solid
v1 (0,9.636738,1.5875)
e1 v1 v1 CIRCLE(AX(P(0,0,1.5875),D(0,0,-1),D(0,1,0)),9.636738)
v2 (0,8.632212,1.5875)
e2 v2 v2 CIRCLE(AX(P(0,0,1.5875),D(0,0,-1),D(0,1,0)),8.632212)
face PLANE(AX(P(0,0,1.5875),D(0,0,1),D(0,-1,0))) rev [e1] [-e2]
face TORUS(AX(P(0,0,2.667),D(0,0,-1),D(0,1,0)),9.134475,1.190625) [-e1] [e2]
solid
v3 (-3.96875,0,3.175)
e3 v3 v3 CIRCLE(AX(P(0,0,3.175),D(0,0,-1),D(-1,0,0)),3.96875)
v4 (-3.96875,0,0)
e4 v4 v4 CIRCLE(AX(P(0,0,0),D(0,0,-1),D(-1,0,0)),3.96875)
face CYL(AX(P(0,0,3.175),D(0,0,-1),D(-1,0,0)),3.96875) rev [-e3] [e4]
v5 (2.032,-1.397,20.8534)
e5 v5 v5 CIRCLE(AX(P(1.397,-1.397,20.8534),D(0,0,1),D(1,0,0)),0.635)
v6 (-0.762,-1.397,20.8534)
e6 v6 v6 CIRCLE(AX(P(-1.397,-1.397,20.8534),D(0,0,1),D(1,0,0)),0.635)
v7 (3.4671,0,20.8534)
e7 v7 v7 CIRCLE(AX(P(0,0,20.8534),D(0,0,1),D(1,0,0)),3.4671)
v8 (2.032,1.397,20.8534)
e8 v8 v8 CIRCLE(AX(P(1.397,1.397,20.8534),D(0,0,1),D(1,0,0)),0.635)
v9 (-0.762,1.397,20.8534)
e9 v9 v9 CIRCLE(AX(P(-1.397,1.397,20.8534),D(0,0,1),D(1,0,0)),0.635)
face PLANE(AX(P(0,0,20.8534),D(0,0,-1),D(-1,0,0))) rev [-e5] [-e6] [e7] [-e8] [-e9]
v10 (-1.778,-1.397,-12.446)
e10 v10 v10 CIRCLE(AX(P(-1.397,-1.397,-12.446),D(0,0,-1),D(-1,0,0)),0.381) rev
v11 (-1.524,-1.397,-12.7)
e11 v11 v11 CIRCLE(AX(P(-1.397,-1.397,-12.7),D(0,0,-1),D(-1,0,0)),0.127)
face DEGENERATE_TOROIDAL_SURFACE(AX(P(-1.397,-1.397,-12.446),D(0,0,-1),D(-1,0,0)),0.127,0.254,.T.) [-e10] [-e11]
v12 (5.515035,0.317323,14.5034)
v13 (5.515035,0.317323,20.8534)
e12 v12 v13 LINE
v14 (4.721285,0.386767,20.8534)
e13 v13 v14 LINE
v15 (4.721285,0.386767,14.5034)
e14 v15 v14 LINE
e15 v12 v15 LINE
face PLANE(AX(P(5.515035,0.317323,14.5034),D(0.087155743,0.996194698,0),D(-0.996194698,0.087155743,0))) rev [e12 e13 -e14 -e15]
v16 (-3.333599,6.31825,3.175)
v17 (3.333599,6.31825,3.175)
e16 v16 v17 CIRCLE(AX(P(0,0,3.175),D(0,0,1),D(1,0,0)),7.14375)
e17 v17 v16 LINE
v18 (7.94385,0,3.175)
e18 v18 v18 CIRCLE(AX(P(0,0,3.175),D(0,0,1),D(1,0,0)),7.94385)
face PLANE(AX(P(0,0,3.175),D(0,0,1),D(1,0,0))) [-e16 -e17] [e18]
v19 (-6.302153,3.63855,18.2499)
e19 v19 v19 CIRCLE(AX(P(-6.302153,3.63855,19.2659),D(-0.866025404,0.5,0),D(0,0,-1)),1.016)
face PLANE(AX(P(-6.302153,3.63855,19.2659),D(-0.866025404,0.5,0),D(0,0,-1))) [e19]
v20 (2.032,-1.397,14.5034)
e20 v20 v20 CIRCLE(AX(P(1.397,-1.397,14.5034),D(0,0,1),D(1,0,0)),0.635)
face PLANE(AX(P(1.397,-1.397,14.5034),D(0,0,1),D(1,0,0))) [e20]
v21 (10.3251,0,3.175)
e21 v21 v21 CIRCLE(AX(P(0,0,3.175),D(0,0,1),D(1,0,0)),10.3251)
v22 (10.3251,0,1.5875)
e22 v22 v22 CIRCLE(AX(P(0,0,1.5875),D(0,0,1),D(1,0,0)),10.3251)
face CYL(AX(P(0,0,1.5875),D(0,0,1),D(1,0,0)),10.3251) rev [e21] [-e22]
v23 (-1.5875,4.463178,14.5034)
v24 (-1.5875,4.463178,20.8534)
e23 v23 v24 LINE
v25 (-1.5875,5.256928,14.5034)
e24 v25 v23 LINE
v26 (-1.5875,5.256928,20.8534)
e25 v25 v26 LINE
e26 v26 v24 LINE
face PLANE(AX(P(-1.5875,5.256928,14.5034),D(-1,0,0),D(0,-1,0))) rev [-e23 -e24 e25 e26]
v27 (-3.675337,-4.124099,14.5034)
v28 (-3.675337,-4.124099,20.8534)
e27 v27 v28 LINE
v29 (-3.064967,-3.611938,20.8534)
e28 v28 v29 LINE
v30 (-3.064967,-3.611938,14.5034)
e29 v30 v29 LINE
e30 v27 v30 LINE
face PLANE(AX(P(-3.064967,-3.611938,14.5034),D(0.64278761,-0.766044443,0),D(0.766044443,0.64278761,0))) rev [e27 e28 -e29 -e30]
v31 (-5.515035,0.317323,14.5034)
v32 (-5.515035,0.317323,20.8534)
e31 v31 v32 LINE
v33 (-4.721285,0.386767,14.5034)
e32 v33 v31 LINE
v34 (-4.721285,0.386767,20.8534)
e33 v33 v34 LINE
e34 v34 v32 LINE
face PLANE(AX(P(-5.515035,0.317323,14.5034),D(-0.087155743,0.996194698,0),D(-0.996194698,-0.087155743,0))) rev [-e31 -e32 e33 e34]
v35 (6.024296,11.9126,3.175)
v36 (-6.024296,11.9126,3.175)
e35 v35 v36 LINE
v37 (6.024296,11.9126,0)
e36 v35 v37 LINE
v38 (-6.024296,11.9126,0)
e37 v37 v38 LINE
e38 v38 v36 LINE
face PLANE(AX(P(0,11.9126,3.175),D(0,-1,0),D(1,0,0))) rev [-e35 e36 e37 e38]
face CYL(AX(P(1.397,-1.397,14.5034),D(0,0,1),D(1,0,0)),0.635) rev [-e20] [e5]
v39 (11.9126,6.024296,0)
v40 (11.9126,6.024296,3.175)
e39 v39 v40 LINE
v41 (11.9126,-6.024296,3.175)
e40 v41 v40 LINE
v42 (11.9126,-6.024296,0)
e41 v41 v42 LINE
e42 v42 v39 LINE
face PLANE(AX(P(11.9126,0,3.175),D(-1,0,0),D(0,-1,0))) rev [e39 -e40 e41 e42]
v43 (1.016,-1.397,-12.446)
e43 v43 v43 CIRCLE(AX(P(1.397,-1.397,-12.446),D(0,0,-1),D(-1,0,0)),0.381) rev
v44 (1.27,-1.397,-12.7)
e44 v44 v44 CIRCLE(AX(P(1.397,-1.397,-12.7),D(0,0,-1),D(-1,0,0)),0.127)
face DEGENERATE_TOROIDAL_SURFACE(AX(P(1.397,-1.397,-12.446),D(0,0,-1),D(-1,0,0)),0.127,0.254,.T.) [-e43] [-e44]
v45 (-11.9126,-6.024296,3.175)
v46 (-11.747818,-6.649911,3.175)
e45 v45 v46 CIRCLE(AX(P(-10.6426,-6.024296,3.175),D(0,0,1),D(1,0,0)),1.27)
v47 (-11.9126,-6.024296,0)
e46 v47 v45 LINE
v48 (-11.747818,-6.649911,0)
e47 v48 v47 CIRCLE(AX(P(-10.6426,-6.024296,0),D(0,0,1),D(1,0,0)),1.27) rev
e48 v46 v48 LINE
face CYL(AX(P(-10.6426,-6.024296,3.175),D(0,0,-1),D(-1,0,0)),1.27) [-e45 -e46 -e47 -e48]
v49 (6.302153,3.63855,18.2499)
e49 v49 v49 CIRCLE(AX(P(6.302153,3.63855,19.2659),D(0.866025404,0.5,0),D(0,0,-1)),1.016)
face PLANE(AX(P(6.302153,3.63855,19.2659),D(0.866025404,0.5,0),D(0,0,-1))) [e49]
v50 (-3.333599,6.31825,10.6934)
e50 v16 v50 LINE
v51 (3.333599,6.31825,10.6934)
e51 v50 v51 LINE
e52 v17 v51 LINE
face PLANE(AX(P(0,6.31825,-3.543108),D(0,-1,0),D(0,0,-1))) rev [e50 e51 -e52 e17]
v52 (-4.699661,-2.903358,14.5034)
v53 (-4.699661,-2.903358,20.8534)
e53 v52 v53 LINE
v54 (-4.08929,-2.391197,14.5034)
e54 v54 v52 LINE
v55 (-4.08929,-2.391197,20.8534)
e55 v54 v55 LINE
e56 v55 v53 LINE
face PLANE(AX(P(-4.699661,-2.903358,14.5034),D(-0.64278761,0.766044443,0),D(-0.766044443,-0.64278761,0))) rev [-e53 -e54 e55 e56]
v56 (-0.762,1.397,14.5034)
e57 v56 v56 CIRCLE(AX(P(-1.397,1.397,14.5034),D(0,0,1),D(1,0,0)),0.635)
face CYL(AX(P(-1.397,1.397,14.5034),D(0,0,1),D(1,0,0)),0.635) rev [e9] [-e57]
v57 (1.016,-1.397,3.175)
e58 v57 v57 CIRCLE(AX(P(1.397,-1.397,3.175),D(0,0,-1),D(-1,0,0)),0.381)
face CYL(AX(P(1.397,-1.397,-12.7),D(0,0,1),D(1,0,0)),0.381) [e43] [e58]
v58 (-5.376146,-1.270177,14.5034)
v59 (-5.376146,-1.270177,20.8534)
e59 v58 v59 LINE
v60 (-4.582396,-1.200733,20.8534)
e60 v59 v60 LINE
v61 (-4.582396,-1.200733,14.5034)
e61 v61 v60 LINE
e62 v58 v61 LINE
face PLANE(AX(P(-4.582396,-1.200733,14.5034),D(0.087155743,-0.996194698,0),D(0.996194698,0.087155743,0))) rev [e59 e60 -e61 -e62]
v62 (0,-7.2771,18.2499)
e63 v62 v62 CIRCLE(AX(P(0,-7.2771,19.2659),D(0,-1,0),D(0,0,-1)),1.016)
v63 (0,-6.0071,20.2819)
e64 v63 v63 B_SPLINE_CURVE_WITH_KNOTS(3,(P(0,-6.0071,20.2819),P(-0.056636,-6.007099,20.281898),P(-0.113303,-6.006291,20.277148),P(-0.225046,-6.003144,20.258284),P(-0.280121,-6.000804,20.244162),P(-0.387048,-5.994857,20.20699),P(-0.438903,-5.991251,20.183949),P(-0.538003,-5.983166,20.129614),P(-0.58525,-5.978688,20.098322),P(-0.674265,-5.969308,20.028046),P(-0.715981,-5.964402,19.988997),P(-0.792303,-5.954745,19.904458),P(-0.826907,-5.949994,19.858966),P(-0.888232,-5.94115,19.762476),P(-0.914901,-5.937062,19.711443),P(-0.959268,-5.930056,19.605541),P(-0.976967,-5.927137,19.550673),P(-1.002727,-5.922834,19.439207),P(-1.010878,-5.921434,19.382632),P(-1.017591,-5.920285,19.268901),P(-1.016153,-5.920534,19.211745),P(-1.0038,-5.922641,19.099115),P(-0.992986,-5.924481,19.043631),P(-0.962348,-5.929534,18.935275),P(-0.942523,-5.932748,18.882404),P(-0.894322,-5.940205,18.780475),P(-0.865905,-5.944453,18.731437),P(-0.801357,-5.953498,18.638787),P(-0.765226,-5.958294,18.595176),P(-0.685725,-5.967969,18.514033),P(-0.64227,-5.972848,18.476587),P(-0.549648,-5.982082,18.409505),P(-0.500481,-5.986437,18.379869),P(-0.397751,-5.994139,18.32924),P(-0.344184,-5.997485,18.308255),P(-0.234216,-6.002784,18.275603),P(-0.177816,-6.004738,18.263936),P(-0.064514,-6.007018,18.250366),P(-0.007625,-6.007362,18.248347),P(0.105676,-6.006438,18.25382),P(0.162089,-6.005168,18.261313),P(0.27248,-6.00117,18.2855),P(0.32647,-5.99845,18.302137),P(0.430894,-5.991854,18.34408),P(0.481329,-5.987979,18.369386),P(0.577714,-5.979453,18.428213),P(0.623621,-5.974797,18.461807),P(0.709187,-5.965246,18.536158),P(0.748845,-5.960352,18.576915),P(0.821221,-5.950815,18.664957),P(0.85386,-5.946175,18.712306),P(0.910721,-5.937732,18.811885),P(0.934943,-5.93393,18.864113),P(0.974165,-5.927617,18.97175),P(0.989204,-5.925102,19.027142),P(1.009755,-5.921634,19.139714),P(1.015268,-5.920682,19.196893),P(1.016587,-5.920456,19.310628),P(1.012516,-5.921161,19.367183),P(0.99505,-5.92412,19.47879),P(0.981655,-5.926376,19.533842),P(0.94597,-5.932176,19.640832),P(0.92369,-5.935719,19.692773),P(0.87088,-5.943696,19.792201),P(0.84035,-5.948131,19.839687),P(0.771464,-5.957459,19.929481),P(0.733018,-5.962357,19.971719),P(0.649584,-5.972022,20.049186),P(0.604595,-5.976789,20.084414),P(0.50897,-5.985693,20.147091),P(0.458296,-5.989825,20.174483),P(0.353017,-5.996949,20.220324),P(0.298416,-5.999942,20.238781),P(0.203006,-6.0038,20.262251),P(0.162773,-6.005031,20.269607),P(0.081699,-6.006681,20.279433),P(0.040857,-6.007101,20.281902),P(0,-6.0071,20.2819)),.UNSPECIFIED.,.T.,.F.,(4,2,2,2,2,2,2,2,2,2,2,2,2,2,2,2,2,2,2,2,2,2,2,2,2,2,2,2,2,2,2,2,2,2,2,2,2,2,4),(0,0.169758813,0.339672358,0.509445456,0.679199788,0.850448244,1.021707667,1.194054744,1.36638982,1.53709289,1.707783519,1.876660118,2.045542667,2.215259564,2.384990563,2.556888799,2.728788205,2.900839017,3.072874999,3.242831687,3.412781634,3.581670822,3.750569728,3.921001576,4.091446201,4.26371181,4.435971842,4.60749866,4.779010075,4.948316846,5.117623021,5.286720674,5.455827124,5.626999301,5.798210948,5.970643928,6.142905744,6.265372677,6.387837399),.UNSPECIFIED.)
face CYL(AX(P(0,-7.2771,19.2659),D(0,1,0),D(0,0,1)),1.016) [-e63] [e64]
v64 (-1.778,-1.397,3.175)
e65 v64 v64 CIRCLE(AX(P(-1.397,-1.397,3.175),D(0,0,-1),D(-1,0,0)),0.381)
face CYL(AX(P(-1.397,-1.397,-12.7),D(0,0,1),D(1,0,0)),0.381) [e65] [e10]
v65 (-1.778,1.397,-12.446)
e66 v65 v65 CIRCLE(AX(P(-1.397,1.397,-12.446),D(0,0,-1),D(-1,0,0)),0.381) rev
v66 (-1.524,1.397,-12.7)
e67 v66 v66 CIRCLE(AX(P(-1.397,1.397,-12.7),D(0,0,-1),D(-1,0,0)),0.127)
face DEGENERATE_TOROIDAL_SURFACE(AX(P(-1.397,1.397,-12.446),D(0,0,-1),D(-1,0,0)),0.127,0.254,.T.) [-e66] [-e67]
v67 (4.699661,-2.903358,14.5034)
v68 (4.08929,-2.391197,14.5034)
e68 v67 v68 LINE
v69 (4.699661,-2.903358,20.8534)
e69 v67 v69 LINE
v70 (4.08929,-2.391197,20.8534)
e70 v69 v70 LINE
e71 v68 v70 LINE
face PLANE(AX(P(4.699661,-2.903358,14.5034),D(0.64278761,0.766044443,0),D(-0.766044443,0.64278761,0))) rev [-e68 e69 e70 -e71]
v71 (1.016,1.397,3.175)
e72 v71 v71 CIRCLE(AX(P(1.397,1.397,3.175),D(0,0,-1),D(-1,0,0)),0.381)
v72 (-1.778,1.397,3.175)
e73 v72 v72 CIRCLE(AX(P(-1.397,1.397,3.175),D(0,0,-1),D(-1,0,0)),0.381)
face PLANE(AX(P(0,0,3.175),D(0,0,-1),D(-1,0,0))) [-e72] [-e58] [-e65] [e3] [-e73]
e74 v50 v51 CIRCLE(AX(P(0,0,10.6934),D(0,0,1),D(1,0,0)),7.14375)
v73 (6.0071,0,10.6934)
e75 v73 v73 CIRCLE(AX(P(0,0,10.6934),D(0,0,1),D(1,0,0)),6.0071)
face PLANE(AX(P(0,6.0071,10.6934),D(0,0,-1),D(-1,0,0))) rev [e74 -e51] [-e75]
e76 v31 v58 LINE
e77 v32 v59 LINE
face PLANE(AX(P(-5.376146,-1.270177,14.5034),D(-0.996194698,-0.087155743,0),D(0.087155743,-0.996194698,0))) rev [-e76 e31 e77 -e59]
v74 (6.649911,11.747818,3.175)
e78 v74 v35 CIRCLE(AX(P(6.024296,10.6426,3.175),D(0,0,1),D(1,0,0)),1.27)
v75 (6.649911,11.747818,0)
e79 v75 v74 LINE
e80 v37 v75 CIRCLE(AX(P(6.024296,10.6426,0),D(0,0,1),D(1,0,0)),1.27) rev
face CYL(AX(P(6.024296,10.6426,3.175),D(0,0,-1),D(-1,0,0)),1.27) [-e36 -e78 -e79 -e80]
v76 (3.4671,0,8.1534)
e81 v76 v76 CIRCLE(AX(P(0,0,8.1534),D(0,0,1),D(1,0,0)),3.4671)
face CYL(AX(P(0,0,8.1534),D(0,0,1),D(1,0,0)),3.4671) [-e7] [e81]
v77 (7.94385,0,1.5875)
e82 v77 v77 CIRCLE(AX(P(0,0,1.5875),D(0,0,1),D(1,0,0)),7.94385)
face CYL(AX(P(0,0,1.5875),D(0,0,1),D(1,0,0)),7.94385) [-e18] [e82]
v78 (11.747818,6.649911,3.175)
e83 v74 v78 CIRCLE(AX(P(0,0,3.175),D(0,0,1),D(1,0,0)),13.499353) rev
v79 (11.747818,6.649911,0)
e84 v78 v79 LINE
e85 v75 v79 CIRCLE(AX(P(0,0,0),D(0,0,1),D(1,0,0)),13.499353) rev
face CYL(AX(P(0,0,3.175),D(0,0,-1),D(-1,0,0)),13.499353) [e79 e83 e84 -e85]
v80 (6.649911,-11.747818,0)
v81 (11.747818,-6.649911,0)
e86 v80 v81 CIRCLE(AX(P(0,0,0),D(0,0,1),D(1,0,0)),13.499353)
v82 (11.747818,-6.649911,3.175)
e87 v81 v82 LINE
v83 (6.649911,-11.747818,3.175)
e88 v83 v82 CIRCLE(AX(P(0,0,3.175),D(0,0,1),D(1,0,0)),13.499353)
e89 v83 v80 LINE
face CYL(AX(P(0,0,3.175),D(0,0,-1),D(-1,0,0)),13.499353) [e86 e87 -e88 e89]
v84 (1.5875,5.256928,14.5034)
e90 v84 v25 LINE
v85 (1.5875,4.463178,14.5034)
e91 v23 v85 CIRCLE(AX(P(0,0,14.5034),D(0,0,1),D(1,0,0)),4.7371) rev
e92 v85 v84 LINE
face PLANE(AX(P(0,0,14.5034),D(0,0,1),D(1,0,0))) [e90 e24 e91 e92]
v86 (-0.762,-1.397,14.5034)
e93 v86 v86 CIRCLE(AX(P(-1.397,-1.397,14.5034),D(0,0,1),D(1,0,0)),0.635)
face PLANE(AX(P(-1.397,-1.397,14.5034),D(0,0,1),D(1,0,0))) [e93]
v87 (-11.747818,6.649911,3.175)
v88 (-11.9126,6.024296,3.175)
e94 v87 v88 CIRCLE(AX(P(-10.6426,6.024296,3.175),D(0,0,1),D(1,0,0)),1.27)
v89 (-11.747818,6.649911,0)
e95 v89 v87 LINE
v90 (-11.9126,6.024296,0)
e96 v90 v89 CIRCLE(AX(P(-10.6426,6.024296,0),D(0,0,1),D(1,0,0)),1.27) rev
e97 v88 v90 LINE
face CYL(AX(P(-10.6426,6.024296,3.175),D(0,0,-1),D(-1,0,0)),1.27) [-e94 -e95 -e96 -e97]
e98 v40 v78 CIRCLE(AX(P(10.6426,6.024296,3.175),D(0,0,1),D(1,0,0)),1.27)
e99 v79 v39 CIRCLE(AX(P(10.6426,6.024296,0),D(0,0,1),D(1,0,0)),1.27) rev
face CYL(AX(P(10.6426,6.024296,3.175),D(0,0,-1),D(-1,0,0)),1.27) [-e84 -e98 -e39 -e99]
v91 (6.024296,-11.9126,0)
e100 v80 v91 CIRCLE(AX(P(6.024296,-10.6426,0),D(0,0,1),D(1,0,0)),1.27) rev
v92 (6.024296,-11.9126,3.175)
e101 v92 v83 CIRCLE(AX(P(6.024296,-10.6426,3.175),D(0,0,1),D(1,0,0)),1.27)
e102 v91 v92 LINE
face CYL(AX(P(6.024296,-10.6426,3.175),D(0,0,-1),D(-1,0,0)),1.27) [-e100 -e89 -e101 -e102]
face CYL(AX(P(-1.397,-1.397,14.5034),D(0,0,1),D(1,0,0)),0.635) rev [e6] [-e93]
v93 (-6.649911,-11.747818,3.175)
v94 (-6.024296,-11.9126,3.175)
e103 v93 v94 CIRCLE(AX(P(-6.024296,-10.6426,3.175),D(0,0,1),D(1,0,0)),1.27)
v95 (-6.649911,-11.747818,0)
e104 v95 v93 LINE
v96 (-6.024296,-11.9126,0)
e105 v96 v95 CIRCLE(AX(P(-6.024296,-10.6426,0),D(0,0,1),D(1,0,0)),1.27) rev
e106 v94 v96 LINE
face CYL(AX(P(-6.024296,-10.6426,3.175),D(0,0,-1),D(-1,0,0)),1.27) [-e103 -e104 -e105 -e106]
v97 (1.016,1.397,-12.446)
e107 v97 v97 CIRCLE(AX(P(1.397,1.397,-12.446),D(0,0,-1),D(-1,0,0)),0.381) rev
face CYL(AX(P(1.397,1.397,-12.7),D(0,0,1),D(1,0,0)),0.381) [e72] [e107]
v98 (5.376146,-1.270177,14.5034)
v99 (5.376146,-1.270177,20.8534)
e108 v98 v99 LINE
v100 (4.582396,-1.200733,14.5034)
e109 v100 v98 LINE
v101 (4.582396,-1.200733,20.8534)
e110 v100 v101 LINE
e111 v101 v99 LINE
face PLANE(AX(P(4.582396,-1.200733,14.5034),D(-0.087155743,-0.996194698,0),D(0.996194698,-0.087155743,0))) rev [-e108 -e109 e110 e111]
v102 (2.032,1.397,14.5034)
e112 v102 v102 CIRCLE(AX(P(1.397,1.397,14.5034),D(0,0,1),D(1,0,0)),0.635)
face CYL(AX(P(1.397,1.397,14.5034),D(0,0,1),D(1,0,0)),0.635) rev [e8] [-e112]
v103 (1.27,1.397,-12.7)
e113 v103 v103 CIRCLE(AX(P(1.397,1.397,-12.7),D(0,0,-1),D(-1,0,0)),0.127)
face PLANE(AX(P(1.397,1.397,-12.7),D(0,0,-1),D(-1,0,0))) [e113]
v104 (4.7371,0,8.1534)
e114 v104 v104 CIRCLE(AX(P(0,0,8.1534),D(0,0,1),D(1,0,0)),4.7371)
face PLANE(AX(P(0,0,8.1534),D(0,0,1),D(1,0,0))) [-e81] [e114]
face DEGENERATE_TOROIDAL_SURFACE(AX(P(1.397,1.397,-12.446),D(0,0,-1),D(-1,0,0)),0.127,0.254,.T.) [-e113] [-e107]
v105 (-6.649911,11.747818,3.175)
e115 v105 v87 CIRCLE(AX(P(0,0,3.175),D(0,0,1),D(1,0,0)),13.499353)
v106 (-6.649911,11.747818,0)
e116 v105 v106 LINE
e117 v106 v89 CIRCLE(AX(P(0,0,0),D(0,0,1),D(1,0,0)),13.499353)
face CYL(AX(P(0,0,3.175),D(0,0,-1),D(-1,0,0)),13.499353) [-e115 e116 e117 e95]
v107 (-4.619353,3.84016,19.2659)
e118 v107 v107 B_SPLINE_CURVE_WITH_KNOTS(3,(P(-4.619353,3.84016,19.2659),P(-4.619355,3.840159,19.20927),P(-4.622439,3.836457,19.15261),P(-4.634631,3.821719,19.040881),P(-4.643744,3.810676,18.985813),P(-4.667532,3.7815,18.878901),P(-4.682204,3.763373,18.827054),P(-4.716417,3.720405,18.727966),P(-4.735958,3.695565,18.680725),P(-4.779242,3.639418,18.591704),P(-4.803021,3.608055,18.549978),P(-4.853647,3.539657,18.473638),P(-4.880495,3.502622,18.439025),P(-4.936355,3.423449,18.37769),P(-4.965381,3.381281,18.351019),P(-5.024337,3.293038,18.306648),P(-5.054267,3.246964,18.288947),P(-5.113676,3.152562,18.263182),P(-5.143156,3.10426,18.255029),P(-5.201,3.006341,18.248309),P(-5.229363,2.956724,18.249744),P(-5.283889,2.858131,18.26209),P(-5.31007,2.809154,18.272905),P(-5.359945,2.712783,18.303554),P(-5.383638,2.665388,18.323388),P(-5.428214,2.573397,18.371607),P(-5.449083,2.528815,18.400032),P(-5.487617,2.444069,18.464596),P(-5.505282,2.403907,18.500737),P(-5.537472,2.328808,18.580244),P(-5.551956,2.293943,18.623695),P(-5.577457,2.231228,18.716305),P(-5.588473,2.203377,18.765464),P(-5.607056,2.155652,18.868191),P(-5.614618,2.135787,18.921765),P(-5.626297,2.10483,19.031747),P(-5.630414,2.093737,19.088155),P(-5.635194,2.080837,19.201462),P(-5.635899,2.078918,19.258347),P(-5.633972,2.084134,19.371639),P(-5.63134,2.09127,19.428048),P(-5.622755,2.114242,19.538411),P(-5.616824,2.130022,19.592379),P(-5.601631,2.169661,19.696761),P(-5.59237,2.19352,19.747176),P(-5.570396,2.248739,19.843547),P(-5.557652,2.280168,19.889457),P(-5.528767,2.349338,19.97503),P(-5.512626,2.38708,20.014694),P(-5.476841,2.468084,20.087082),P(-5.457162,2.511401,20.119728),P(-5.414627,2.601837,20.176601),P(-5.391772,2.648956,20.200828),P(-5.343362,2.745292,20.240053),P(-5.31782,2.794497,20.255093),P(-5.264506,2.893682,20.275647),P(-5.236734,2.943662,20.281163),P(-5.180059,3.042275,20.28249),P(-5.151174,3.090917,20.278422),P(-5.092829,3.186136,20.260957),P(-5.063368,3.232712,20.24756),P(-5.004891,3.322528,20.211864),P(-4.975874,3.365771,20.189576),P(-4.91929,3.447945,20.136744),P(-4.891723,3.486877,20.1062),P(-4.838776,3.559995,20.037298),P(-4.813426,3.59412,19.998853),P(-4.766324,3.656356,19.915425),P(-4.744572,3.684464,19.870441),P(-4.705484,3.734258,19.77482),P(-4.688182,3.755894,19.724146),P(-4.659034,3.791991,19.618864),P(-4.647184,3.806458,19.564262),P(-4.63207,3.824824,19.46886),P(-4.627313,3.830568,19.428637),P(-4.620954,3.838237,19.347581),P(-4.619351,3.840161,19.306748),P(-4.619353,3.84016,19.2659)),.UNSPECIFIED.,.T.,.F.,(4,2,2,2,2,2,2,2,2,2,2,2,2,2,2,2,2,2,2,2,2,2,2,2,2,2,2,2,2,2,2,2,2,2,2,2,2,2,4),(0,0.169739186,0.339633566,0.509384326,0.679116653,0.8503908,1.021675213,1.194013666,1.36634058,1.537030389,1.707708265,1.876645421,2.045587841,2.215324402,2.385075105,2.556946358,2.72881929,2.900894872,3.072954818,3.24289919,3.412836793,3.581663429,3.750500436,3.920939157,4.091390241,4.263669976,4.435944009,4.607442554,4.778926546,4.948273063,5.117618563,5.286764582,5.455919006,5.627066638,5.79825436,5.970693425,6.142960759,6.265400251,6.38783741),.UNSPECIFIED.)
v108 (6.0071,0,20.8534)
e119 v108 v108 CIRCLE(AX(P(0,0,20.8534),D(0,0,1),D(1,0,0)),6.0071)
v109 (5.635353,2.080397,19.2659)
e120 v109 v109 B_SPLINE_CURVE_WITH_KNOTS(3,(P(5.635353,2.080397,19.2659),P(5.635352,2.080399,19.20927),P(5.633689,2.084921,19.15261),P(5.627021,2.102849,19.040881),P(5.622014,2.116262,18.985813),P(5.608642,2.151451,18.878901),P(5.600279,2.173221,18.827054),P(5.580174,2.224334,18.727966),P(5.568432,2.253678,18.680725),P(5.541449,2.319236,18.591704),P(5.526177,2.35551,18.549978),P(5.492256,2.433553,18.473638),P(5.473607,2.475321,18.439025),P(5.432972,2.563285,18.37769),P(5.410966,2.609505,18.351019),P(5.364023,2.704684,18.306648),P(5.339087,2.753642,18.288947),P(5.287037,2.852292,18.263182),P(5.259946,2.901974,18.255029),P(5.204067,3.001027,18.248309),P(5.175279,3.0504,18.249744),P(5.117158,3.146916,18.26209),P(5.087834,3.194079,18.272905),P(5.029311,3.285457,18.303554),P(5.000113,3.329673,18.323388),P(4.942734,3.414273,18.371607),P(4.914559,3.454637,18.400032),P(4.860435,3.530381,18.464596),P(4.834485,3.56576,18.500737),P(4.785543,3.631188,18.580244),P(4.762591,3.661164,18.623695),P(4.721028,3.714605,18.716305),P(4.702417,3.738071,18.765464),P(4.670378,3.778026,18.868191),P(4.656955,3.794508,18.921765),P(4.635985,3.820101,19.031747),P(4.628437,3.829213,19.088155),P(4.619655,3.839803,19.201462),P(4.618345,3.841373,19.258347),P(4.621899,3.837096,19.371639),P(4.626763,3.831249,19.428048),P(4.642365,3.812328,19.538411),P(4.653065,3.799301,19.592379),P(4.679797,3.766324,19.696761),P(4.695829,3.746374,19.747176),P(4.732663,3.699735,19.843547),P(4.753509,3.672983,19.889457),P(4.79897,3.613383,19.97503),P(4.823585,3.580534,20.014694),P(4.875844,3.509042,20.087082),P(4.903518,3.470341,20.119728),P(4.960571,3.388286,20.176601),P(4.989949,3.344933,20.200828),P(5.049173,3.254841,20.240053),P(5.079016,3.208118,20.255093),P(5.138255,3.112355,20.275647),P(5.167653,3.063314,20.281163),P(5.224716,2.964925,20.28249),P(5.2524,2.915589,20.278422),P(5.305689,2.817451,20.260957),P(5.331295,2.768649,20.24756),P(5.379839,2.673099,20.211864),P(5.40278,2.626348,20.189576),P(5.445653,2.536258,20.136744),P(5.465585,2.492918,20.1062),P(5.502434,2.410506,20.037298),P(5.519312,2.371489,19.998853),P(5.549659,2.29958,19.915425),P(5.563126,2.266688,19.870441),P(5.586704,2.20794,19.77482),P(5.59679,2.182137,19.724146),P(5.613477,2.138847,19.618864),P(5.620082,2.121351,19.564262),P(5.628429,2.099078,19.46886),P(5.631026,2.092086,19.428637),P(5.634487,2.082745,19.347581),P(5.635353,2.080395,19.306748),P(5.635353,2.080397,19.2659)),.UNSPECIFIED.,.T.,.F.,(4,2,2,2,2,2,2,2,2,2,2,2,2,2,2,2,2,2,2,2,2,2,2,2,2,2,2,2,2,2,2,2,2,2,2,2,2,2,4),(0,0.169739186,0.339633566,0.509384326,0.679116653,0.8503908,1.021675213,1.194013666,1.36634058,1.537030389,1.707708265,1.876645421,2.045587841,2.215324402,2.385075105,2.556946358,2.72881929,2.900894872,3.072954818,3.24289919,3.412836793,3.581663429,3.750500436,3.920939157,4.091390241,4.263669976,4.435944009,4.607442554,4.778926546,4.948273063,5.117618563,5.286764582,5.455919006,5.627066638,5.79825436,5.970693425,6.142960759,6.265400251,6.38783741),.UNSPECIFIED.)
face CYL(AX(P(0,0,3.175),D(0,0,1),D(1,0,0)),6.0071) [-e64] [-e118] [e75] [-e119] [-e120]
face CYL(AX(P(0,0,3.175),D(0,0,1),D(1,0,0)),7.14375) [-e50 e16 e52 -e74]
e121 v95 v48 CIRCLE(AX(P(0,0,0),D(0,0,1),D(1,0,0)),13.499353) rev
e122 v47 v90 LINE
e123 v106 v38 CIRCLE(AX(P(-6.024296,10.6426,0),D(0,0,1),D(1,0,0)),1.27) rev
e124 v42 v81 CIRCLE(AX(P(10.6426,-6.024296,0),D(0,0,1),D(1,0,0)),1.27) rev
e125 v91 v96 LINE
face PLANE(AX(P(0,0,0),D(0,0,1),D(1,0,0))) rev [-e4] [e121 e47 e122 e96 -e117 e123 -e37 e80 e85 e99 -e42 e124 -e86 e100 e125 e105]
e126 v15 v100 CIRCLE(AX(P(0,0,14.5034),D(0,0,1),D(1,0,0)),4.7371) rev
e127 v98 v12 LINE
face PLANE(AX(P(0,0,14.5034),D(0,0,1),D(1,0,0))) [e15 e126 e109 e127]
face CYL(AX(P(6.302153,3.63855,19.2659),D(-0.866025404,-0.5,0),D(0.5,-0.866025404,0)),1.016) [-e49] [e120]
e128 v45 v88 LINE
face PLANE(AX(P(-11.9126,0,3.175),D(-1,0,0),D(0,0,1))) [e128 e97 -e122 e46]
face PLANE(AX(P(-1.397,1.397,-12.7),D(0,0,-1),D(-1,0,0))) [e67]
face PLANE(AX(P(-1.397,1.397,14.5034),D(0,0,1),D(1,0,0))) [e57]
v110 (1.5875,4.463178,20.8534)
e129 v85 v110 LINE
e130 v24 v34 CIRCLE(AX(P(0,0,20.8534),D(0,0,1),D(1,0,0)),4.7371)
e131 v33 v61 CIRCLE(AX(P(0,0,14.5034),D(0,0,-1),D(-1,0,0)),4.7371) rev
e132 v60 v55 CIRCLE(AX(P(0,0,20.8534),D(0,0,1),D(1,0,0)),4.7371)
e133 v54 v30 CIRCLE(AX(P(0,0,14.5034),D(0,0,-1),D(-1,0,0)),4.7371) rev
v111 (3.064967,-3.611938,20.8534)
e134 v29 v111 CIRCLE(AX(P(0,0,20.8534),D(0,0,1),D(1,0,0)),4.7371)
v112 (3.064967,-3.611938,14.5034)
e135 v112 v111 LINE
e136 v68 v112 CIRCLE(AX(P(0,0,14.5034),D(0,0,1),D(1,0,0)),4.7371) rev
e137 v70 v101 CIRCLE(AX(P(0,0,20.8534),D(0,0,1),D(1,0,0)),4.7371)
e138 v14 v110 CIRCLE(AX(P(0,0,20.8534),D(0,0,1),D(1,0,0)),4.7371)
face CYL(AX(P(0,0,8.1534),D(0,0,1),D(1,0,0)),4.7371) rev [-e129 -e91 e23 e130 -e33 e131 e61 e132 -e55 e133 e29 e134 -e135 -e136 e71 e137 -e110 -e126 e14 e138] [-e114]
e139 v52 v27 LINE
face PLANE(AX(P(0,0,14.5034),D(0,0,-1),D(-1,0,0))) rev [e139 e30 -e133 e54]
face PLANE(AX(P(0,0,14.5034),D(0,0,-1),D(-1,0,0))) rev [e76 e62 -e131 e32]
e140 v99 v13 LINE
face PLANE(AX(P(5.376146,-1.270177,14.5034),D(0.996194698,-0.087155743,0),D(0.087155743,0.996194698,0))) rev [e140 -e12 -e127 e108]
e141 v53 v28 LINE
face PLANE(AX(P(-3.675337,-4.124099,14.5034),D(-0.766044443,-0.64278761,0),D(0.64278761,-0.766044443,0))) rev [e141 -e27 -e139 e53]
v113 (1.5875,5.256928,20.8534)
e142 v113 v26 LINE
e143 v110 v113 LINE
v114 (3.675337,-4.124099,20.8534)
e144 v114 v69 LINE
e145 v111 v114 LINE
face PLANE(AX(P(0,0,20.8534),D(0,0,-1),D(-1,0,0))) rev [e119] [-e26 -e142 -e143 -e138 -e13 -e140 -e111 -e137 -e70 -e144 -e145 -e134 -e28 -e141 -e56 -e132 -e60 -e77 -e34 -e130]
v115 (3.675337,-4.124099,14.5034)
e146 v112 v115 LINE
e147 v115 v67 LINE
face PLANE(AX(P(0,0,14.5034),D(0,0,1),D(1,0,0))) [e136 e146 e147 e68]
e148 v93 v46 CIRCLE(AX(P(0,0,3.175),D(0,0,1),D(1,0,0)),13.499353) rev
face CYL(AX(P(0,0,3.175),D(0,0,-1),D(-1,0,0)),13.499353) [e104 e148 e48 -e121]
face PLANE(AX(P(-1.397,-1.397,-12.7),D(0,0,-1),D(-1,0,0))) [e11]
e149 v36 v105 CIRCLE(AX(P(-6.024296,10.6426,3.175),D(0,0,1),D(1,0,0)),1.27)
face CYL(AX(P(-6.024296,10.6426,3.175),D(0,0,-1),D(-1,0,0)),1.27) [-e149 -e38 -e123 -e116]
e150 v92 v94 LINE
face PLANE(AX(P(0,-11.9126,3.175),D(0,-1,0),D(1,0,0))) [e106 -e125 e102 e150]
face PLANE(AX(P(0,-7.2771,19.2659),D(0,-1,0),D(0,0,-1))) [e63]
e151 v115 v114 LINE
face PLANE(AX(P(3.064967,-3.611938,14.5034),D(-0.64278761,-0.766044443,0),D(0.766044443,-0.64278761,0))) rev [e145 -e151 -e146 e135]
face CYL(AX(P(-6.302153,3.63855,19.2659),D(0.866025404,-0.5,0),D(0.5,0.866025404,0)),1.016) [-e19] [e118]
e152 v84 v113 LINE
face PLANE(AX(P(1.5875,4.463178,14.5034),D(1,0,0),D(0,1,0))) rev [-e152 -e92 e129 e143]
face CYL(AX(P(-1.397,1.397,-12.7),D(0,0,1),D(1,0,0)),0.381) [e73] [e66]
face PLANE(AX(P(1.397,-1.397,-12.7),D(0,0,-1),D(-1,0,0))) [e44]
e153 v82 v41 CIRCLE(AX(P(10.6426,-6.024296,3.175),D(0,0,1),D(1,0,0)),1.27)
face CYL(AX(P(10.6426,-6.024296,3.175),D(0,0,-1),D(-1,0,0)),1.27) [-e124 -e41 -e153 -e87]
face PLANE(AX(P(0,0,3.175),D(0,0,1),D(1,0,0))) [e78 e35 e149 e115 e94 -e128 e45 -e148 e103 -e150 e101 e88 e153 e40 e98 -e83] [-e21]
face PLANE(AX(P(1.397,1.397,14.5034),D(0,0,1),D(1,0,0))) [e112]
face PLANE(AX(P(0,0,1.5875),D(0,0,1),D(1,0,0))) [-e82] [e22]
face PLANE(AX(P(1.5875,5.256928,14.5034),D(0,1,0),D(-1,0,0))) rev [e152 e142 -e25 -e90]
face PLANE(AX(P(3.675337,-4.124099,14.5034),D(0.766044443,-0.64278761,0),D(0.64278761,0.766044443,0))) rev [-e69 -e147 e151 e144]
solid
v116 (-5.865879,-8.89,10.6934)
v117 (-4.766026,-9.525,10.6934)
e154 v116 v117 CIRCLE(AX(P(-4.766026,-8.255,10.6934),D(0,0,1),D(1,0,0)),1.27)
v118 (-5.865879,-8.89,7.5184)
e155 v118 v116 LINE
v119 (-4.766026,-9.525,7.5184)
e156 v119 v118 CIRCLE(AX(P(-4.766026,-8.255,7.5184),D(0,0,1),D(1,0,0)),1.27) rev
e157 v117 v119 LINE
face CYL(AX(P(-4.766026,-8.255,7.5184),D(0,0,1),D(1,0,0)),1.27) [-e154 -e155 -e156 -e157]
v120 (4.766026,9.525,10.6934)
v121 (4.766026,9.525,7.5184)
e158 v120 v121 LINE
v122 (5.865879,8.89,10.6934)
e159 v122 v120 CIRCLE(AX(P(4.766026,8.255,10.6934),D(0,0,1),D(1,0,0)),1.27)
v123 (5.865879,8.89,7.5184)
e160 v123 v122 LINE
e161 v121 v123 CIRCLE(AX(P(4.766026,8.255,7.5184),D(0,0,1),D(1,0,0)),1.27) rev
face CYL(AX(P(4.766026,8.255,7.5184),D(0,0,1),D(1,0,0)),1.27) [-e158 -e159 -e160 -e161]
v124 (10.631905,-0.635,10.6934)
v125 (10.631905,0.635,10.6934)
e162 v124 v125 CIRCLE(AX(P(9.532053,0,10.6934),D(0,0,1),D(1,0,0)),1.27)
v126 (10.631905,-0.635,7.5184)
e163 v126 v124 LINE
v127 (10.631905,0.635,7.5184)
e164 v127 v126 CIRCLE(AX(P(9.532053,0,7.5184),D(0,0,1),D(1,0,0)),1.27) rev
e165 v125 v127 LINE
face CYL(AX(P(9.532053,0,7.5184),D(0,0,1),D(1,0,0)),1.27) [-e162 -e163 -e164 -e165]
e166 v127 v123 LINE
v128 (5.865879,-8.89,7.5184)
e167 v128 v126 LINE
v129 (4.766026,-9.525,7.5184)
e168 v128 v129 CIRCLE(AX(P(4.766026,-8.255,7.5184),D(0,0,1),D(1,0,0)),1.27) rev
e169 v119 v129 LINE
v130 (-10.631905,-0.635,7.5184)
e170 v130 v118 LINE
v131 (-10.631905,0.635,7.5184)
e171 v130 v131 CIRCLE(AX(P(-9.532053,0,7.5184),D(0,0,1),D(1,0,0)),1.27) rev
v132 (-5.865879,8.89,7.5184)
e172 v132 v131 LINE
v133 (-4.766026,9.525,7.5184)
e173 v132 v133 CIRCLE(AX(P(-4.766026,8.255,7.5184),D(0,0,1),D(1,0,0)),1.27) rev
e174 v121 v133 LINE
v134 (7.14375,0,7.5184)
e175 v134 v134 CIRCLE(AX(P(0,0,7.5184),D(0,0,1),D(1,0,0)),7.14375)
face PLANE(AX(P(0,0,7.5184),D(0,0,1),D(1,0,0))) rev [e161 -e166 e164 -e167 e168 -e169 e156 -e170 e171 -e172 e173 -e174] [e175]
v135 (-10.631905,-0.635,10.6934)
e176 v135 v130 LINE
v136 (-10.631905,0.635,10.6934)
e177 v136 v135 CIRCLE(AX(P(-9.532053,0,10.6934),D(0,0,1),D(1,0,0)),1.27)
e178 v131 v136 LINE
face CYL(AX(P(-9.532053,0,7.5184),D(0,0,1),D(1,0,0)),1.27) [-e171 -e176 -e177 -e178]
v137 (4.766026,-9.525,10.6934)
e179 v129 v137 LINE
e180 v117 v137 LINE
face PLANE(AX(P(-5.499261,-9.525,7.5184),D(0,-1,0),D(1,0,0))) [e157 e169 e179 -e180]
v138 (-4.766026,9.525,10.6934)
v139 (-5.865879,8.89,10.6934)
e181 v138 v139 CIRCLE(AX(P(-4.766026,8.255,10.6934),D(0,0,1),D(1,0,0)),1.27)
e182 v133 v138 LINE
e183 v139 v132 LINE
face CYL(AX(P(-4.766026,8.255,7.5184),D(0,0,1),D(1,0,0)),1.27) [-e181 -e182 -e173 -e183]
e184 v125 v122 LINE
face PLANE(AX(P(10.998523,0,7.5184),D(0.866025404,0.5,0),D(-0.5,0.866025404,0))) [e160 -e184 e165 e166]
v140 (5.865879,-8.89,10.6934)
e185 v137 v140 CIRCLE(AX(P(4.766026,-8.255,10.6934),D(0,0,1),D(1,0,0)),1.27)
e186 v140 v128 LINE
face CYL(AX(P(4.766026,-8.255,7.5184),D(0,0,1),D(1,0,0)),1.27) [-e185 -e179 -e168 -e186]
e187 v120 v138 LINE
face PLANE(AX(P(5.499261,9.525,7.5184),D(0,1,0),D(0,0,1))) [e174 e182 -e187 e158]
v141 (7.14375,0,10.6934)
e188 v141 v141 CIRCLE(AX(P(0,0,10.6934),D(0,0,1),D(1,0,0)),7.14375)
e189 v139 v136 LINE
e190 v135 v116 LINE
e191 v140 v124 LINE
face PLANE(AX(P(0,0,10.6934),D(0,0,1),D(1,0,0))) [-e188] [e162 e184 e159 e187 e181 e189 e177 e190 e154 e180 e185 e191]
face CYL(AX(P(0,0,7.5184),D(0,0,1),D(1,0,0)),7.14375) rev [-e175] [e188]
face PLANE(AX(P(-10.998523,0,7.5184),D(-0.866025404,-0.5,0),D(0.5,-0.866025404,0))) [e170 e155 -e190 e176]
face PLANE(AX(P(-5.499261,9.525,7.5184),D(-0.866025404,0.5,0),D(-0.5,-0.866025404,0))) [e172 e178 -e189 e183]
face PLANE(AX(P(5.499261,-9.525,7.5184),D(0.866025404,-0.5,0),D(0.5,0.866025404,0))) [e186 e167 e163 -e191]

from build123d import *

# Parameters (mm, degrees)
BOSS_EXTRUDE1_DEPTH         = 3.175
SKETCH3_R                   = 10.3251
SKETCH3_R_2                 = 7.94385
CUT_EXTRUDE1_DEPTH          = 1.5875
CUT_EXTRUDE2_DEPTH          = 7.5184
SKETCH5_R                   = 7.14375
BOSS_EXTRUDE2_DEPTH         = 3.175
SKETCH6_R                   = 4.7371
SKETCH6_R_2                 = 3.4671
CUT_EXTRUDE3_DEPTH          = 12.7
SKETCH7_R                   = 3.96875
CUT_EXTRUDE4_DEPTH          = 3.175
SKETCH8_R                   = 1.016
BOSS_EXTRUDE3_DEPTH         = 1.27
CIRPATTERN1_COUNT           = 3
SKETCH12_W                  = 3.175
SKETCH12_H                  = 0.79375
CUT_EXTRUDE6_DEPTH          = 6.35
FILLET2_R                   = 1.27
FILLET3_R                   = 1.27
SKETCH10_R                  = 0.635
CUT_EXTRUDE5_DEPTH          = 6.35
SKETCH11_R                  = 0.381
BOSS_EXTRUDE4_DEPTH         = 15.875
FILLET1_R                   = 0.254
SKETCH_PATTERN1_START       = 14.5034
SKETCH_PATTERN1_4_OUTLINE_R = 0.635
SKETCH_PATTERN1_4_DEPTH     = 6.35


# Read off the part's stored shape, not the designer's step: Sketch-Pattern1
with BuildPart() as part:
    # Sketch1 → Boss-Extrude1 (new body)
    with BuildSketch(Plane.XY):
        with BuildLine():
            Line((-6.35, -11.9126), (6.35, -11.9126))
            ThreePointArc((6.35, -11.9126), (9.54548424, -9.54548424), (11.9126, -6.35))
            Line((11.9126, -6.35), (11.9126, 6.35))
            ThreePointArc((11.9126, 6.35), (9.54548424, 9.54548424), (6.35, 11.9126))
            Line((6.35, 11.9126), (-6.35, 11.9126))
            ThreePointArc((-6.35, 11.9126), (-9.54548424, 9.54548424), (-11.9126, 6.35))
            Line((-11.9126, 6.35), (-11.9126, -6.35))
            ThreePointArc((-11.9126, -6.35), (-9.54548424, -9.54548424), (-6.35, -11.9126))
        make_face()
    extrude(amount=BOSS_EXTRUDE1_DEPTH)

    # Sketch2 → Revolve1 (revolve)
    with BuildSketch(Plane(origin=(0, 0, 0), x_dir=(0, 0, -1), z_dir=(1, 0, 0)), mode=Mode.PRIVATE) as revolve1_sk:
        Polygon((-3.175, 0), (-20.8534, 0), (-20.8534, 6.0071), (-10.6934, 6.0071), (-10.6934, 7.14375), (-3.175, 7.14375), align=None)
    revolve(revolve1_sk.sketch.rotate(Axis((0, 0, 3.175), (0, 0, -1)), 90), axis=Axis((0, 0, 3.175), (0, 0, -1)))

    # Sketch3 → Cut-Extrude1 (cut)
    with BuildSketch(Plane.XY.offset(3.175)):
        Circle(SKETCH3_R)
        Circle(SKETCH3_R_2, mode=Mode.SUBTRACT)
    extrude(amount=-CUT_EXTRUDE1_DEPTH, mode=Mode.SUBTRACT)

    # Sketch4 → Cut-Extrude2 (cut)
    with BuildSketch(Plane.XY.offset(10.6934)):
        Polygon((-60.865081836, 6.31825), (-3.333598806, 6.31825), (3.333598806, 6.31825), (60.865081836, 6.31825), (60.865081836, 121.38121606), (-60.865081836, 121.38121606), align=None)
    extrude(amount=-CUT_EXTRUDE2_DEPTH, mode=Mode.SUBTRACT)

    # Sketch6 → Cut-Extrude3 (cut)
    with BuildSketch(Plane.XY.offset(20.8534)):
        Circle(SKETCH6_R)
        Circle(SKETCH6_R_2, mode=Mode.SUBTRACT)
    extrude(amount=-CUT_EXTRUDE3_DEPTH, mode=Mode.SUBTRACT)

    # Sketch7 → Cut-Extrude4 (cut)
    with BuildSketch(Plane(origin=(0, 0, 0), x_dir=(-1, 0, 0), z_dir=(0, 0, -1))):
        Circle(SKETCH7_R)
    extrude(amount=-CUT_EXTRUDE4_DEPTH, mode=Mode.SUBTRACT)

    # Sketch8 → Boss-Extrude3 (add, symmetric)
    with BuildSketch(Plane(origin=(0, -6.0071, 0), x_dir=(-1, 0, 0), z_dir=(0, -1, 0))):
        with Locations(Location((0, -19.2659, 0), (0, 0, 270))):
            Circle(SKETCH8_R)
    boss_extrude3 = extrude(amount=BOSS_EXTRUDE3_DEPTH, both=True)

    # CirPattern1: Boss-Extrude3 ×3 about axis
    cirpattern1_axis = Axis((0, 0, 0), (0, 0, 1))
    for i in range(1, CIRPATTERN1_COUNT):
        add(boss_extrude3.rotate(cirpattern1_axis, i * 360 / CIRPATTERN1_COUNT))

    # Sketch12 → Cut-Extrude6 (cut)
    with BuildSketch(Plane.XY.offset(20.8534)):
        with Locations((0, 4.860053258)):
            Rectangle(SKETCH12_W, SKETCH12_H)
        Polygon((-4.721284564, 0.386766697), (-4.58239631, -1.200733303), (-5.37614631, -1.270177429), (-5.515034564, 0.317322571), align=None)
        Polygon((-4.089290166, -2.391196844), (-3.064966977, -3.611937685), (-3.675337397, -4.12409928), (-4.699660586, -2.903358439), align=None)
        Polygon((3.675337397, -4.12409928), (4.699660586, -2.903358439), (4.089290166, -2.391196844), (3.064966977, -3.611937685), align=None)
        Polygon((4.721284564, 0.386766697), (4.58239631, -1.200733303), (5.37614631, -1.270177429), (5.515034564, 0.317322571), align=None)
    extrude(amount=-CUT_EXTRUDE6_DEPTH, mode=Mode.SUBTRACT)

    # Fillet3
    fillet3_edges = [part.edges().sort_by_distance(p)[0] for p in [
        (-11.9126, -6.35, 1.5875),
        (-11.9126, 6.35, 1.5875),
        (-6.35, 11.9126, 1.5875),
        (6.35, 11.9126, 1.5875),
        (11.9126, 6.35, 1.5875),
        (11.9126, -6.35, 1.5875),
        (6.35, -11.9126, 1.5875),
        (-6.35, -11.9126, 1.5875),
    ]]
    fillet(fillet3_edges, radius=FILLET3_R)

    # Sketch10 → Cut-Extrude5 (cut)
    with BuildSketch(Plane.XY.offset(20.8534)):
        with Locations((1.397, 1.397)):
            Circle(SKETCH10_R)
    extrude(amount=-CUT_EXTRUDE5_DEPTH, mode=Mode.SUBTRACT)

    # Sketch11 → Boss-Extrude4 (add)
    with BuildSketch(Plane(origin=(0, 0, 3.175), x_dir=(-1, 0, 0), z_dir=(0, 0, -1))):
        with Locations((-1.397, 1.397)):
            Circle(SKETCH11_R)
    extrude(amount=BOSS_EXTRUDE4_DEPTH)

    # Fillet1
    fillet1_edges = [part.edges().sort_by_distance(p)[0] for p in [
        (1.778, 1.397, -12.7),
    ]]
    fillet(fillet1_edges, radius=FILLET1_R)

    # Sketch-Pattern1 outline → Sketch-Pattern1 (revolve)
    with BuildSketch(Plane(origin=(1.397, -1.397, 0), x_dir=(1, 0, 0), z_dir=(0, -1, 0))):
        with BuildLine():
            Line((0, 3.175), (0, -12.7))
            Line((0, -12.7), (0.127, -12.7))
            ThreePointArc((0.127, -12.7), (0.306605122, -12.625605122), (0.381, -12.446))
            Line((0.381, -12.446), (0.381, 3.175))
            Line((0.381, 3.175), (0, 3.175))
        make_face()
    revolve(axis=Axis((1.397, -1.397, 0), (0, 0, 1)))

    # Sketch-Pattern1 2 outline → Sketch-Pattern1 2 (revolve)
    with BuildSketch(Plane(origin=(-1.397, -1.397, 0), x_dir=(1, 0, 0), z_dir=(0, -1, 0))):
        with BuildLine():
            Line((0, 3.175), (0, -12.7))
            Line((0, -12.7), (0.127, -12.7))
            ThreePointArc((0.127, -12.7), (0.306605122, -12.625605122), (0.381, -12.446))
            Line((0.381, -12.446), (0.381, 3.175))
            Line((0.381, 3.175), (0, 3.175))
        make_face()
    revolve(axis=Axis((-1.397, -1.397, 0), (0, 0, 1)))

    # Sketch-Pattern1 3 outline → Sketch-Pattern1 3 (revolve)
    with BuildSketch(Plane(origin=(-1.397, 1.397, 0), x_dir=(1, 0, 0), z_dir=(0, -1, 0))):
        with BuildLine():
            Line((0, 3.175), (0, -12.7))
            Line((0, -12.7), (0.127, -12.7))
            ThreePointArc((0.127, -12.7), (0.306605122, -12.625605122), (0.381, -12.446))
            Line((0.381, -12.446), (0.381, 3.175))
            Line((0.381, 3.175), (0, 3.175))
        make_face()
    revolve(axis=Axis((-1.397, 1.397, 0), (0, 0, 1)))

    # Sketch-Pattern1 4 outline → Sketch-Pattern1 4 (cut)
    with BuildSketch(Plane.XY.offset(SKETCH_PATTERN1_START)):
        with Locations((1.397, -1.397)):
            Circle(SKETCH_PATTERN1_4_OUTLINE_R)
        with Locations((-1.397, -1.397)):
            Circle(SKETCH_PATTERN1_4_OUTLINE_R)
        with Locations((-1.397, 1.397)):
            Circle(SKETCH_PATTERN1_4_OUTLINE_R)
    extrude(amount=SKETCH_PATTERN1_4_DEPTH, mode=Mode.SUBTRACT)


with BuildPart() as body_2:
    # Sketch5 → Boss-Extrude2 (new body)
    with BuildSketch(Plane.XY.offset(10.6934)):
        Polygon((-5.499261314, 9.525), (-10.998522628, 0), (-5.499261314, -9.525), (5.499261314, -9.525), (10.998522628, 0), (5.499261314, 9.525), align=None)
        Circle(SKETCH5_R, mode=Mode.SUBTRACT)
    extrude(amount=-BOSS_EXTRUDE2_DEPTH)

    # Fillet2
    fillet2_edges = [body_2.edges().sort_by_distance(p)[0] for p in [
        (5.499261314, 9.525, 9.1059),
        (10.998522628, 0, 9.1059),
        (5.499261314, -9.525, 9.1059),
        (-5.499261314, -9.525, 9.1059),
        (-10.998522628, 0, 9.1059),
        (-5.499261314, 9.525, 9.1059),
    ]]
    fillet(fillet2_edges, radius=FILLET2_R)


with BuildPart() as body_3:
    # Sketch13 → Revolve2 (revolve)
    with BuildSketch(Plane(origin=(0, 0, 0), x_dir=(0, 0, -1), z_dir=(1, 0, 0))):
        with BuildLine():
            Line((-1.5875, 9.636737522), (-1.5875, 8.632212478))
            ThreePointArc((-1.5875, 8.632212478), (-3.857625, 9.134475), (-1.5875, 9.636737522))
        make_face()
    revolve(axis=Axis((0, 0, 0), (0, 0, 1)))


solid = Compound([part.part, body_2.part, body_3.part])
